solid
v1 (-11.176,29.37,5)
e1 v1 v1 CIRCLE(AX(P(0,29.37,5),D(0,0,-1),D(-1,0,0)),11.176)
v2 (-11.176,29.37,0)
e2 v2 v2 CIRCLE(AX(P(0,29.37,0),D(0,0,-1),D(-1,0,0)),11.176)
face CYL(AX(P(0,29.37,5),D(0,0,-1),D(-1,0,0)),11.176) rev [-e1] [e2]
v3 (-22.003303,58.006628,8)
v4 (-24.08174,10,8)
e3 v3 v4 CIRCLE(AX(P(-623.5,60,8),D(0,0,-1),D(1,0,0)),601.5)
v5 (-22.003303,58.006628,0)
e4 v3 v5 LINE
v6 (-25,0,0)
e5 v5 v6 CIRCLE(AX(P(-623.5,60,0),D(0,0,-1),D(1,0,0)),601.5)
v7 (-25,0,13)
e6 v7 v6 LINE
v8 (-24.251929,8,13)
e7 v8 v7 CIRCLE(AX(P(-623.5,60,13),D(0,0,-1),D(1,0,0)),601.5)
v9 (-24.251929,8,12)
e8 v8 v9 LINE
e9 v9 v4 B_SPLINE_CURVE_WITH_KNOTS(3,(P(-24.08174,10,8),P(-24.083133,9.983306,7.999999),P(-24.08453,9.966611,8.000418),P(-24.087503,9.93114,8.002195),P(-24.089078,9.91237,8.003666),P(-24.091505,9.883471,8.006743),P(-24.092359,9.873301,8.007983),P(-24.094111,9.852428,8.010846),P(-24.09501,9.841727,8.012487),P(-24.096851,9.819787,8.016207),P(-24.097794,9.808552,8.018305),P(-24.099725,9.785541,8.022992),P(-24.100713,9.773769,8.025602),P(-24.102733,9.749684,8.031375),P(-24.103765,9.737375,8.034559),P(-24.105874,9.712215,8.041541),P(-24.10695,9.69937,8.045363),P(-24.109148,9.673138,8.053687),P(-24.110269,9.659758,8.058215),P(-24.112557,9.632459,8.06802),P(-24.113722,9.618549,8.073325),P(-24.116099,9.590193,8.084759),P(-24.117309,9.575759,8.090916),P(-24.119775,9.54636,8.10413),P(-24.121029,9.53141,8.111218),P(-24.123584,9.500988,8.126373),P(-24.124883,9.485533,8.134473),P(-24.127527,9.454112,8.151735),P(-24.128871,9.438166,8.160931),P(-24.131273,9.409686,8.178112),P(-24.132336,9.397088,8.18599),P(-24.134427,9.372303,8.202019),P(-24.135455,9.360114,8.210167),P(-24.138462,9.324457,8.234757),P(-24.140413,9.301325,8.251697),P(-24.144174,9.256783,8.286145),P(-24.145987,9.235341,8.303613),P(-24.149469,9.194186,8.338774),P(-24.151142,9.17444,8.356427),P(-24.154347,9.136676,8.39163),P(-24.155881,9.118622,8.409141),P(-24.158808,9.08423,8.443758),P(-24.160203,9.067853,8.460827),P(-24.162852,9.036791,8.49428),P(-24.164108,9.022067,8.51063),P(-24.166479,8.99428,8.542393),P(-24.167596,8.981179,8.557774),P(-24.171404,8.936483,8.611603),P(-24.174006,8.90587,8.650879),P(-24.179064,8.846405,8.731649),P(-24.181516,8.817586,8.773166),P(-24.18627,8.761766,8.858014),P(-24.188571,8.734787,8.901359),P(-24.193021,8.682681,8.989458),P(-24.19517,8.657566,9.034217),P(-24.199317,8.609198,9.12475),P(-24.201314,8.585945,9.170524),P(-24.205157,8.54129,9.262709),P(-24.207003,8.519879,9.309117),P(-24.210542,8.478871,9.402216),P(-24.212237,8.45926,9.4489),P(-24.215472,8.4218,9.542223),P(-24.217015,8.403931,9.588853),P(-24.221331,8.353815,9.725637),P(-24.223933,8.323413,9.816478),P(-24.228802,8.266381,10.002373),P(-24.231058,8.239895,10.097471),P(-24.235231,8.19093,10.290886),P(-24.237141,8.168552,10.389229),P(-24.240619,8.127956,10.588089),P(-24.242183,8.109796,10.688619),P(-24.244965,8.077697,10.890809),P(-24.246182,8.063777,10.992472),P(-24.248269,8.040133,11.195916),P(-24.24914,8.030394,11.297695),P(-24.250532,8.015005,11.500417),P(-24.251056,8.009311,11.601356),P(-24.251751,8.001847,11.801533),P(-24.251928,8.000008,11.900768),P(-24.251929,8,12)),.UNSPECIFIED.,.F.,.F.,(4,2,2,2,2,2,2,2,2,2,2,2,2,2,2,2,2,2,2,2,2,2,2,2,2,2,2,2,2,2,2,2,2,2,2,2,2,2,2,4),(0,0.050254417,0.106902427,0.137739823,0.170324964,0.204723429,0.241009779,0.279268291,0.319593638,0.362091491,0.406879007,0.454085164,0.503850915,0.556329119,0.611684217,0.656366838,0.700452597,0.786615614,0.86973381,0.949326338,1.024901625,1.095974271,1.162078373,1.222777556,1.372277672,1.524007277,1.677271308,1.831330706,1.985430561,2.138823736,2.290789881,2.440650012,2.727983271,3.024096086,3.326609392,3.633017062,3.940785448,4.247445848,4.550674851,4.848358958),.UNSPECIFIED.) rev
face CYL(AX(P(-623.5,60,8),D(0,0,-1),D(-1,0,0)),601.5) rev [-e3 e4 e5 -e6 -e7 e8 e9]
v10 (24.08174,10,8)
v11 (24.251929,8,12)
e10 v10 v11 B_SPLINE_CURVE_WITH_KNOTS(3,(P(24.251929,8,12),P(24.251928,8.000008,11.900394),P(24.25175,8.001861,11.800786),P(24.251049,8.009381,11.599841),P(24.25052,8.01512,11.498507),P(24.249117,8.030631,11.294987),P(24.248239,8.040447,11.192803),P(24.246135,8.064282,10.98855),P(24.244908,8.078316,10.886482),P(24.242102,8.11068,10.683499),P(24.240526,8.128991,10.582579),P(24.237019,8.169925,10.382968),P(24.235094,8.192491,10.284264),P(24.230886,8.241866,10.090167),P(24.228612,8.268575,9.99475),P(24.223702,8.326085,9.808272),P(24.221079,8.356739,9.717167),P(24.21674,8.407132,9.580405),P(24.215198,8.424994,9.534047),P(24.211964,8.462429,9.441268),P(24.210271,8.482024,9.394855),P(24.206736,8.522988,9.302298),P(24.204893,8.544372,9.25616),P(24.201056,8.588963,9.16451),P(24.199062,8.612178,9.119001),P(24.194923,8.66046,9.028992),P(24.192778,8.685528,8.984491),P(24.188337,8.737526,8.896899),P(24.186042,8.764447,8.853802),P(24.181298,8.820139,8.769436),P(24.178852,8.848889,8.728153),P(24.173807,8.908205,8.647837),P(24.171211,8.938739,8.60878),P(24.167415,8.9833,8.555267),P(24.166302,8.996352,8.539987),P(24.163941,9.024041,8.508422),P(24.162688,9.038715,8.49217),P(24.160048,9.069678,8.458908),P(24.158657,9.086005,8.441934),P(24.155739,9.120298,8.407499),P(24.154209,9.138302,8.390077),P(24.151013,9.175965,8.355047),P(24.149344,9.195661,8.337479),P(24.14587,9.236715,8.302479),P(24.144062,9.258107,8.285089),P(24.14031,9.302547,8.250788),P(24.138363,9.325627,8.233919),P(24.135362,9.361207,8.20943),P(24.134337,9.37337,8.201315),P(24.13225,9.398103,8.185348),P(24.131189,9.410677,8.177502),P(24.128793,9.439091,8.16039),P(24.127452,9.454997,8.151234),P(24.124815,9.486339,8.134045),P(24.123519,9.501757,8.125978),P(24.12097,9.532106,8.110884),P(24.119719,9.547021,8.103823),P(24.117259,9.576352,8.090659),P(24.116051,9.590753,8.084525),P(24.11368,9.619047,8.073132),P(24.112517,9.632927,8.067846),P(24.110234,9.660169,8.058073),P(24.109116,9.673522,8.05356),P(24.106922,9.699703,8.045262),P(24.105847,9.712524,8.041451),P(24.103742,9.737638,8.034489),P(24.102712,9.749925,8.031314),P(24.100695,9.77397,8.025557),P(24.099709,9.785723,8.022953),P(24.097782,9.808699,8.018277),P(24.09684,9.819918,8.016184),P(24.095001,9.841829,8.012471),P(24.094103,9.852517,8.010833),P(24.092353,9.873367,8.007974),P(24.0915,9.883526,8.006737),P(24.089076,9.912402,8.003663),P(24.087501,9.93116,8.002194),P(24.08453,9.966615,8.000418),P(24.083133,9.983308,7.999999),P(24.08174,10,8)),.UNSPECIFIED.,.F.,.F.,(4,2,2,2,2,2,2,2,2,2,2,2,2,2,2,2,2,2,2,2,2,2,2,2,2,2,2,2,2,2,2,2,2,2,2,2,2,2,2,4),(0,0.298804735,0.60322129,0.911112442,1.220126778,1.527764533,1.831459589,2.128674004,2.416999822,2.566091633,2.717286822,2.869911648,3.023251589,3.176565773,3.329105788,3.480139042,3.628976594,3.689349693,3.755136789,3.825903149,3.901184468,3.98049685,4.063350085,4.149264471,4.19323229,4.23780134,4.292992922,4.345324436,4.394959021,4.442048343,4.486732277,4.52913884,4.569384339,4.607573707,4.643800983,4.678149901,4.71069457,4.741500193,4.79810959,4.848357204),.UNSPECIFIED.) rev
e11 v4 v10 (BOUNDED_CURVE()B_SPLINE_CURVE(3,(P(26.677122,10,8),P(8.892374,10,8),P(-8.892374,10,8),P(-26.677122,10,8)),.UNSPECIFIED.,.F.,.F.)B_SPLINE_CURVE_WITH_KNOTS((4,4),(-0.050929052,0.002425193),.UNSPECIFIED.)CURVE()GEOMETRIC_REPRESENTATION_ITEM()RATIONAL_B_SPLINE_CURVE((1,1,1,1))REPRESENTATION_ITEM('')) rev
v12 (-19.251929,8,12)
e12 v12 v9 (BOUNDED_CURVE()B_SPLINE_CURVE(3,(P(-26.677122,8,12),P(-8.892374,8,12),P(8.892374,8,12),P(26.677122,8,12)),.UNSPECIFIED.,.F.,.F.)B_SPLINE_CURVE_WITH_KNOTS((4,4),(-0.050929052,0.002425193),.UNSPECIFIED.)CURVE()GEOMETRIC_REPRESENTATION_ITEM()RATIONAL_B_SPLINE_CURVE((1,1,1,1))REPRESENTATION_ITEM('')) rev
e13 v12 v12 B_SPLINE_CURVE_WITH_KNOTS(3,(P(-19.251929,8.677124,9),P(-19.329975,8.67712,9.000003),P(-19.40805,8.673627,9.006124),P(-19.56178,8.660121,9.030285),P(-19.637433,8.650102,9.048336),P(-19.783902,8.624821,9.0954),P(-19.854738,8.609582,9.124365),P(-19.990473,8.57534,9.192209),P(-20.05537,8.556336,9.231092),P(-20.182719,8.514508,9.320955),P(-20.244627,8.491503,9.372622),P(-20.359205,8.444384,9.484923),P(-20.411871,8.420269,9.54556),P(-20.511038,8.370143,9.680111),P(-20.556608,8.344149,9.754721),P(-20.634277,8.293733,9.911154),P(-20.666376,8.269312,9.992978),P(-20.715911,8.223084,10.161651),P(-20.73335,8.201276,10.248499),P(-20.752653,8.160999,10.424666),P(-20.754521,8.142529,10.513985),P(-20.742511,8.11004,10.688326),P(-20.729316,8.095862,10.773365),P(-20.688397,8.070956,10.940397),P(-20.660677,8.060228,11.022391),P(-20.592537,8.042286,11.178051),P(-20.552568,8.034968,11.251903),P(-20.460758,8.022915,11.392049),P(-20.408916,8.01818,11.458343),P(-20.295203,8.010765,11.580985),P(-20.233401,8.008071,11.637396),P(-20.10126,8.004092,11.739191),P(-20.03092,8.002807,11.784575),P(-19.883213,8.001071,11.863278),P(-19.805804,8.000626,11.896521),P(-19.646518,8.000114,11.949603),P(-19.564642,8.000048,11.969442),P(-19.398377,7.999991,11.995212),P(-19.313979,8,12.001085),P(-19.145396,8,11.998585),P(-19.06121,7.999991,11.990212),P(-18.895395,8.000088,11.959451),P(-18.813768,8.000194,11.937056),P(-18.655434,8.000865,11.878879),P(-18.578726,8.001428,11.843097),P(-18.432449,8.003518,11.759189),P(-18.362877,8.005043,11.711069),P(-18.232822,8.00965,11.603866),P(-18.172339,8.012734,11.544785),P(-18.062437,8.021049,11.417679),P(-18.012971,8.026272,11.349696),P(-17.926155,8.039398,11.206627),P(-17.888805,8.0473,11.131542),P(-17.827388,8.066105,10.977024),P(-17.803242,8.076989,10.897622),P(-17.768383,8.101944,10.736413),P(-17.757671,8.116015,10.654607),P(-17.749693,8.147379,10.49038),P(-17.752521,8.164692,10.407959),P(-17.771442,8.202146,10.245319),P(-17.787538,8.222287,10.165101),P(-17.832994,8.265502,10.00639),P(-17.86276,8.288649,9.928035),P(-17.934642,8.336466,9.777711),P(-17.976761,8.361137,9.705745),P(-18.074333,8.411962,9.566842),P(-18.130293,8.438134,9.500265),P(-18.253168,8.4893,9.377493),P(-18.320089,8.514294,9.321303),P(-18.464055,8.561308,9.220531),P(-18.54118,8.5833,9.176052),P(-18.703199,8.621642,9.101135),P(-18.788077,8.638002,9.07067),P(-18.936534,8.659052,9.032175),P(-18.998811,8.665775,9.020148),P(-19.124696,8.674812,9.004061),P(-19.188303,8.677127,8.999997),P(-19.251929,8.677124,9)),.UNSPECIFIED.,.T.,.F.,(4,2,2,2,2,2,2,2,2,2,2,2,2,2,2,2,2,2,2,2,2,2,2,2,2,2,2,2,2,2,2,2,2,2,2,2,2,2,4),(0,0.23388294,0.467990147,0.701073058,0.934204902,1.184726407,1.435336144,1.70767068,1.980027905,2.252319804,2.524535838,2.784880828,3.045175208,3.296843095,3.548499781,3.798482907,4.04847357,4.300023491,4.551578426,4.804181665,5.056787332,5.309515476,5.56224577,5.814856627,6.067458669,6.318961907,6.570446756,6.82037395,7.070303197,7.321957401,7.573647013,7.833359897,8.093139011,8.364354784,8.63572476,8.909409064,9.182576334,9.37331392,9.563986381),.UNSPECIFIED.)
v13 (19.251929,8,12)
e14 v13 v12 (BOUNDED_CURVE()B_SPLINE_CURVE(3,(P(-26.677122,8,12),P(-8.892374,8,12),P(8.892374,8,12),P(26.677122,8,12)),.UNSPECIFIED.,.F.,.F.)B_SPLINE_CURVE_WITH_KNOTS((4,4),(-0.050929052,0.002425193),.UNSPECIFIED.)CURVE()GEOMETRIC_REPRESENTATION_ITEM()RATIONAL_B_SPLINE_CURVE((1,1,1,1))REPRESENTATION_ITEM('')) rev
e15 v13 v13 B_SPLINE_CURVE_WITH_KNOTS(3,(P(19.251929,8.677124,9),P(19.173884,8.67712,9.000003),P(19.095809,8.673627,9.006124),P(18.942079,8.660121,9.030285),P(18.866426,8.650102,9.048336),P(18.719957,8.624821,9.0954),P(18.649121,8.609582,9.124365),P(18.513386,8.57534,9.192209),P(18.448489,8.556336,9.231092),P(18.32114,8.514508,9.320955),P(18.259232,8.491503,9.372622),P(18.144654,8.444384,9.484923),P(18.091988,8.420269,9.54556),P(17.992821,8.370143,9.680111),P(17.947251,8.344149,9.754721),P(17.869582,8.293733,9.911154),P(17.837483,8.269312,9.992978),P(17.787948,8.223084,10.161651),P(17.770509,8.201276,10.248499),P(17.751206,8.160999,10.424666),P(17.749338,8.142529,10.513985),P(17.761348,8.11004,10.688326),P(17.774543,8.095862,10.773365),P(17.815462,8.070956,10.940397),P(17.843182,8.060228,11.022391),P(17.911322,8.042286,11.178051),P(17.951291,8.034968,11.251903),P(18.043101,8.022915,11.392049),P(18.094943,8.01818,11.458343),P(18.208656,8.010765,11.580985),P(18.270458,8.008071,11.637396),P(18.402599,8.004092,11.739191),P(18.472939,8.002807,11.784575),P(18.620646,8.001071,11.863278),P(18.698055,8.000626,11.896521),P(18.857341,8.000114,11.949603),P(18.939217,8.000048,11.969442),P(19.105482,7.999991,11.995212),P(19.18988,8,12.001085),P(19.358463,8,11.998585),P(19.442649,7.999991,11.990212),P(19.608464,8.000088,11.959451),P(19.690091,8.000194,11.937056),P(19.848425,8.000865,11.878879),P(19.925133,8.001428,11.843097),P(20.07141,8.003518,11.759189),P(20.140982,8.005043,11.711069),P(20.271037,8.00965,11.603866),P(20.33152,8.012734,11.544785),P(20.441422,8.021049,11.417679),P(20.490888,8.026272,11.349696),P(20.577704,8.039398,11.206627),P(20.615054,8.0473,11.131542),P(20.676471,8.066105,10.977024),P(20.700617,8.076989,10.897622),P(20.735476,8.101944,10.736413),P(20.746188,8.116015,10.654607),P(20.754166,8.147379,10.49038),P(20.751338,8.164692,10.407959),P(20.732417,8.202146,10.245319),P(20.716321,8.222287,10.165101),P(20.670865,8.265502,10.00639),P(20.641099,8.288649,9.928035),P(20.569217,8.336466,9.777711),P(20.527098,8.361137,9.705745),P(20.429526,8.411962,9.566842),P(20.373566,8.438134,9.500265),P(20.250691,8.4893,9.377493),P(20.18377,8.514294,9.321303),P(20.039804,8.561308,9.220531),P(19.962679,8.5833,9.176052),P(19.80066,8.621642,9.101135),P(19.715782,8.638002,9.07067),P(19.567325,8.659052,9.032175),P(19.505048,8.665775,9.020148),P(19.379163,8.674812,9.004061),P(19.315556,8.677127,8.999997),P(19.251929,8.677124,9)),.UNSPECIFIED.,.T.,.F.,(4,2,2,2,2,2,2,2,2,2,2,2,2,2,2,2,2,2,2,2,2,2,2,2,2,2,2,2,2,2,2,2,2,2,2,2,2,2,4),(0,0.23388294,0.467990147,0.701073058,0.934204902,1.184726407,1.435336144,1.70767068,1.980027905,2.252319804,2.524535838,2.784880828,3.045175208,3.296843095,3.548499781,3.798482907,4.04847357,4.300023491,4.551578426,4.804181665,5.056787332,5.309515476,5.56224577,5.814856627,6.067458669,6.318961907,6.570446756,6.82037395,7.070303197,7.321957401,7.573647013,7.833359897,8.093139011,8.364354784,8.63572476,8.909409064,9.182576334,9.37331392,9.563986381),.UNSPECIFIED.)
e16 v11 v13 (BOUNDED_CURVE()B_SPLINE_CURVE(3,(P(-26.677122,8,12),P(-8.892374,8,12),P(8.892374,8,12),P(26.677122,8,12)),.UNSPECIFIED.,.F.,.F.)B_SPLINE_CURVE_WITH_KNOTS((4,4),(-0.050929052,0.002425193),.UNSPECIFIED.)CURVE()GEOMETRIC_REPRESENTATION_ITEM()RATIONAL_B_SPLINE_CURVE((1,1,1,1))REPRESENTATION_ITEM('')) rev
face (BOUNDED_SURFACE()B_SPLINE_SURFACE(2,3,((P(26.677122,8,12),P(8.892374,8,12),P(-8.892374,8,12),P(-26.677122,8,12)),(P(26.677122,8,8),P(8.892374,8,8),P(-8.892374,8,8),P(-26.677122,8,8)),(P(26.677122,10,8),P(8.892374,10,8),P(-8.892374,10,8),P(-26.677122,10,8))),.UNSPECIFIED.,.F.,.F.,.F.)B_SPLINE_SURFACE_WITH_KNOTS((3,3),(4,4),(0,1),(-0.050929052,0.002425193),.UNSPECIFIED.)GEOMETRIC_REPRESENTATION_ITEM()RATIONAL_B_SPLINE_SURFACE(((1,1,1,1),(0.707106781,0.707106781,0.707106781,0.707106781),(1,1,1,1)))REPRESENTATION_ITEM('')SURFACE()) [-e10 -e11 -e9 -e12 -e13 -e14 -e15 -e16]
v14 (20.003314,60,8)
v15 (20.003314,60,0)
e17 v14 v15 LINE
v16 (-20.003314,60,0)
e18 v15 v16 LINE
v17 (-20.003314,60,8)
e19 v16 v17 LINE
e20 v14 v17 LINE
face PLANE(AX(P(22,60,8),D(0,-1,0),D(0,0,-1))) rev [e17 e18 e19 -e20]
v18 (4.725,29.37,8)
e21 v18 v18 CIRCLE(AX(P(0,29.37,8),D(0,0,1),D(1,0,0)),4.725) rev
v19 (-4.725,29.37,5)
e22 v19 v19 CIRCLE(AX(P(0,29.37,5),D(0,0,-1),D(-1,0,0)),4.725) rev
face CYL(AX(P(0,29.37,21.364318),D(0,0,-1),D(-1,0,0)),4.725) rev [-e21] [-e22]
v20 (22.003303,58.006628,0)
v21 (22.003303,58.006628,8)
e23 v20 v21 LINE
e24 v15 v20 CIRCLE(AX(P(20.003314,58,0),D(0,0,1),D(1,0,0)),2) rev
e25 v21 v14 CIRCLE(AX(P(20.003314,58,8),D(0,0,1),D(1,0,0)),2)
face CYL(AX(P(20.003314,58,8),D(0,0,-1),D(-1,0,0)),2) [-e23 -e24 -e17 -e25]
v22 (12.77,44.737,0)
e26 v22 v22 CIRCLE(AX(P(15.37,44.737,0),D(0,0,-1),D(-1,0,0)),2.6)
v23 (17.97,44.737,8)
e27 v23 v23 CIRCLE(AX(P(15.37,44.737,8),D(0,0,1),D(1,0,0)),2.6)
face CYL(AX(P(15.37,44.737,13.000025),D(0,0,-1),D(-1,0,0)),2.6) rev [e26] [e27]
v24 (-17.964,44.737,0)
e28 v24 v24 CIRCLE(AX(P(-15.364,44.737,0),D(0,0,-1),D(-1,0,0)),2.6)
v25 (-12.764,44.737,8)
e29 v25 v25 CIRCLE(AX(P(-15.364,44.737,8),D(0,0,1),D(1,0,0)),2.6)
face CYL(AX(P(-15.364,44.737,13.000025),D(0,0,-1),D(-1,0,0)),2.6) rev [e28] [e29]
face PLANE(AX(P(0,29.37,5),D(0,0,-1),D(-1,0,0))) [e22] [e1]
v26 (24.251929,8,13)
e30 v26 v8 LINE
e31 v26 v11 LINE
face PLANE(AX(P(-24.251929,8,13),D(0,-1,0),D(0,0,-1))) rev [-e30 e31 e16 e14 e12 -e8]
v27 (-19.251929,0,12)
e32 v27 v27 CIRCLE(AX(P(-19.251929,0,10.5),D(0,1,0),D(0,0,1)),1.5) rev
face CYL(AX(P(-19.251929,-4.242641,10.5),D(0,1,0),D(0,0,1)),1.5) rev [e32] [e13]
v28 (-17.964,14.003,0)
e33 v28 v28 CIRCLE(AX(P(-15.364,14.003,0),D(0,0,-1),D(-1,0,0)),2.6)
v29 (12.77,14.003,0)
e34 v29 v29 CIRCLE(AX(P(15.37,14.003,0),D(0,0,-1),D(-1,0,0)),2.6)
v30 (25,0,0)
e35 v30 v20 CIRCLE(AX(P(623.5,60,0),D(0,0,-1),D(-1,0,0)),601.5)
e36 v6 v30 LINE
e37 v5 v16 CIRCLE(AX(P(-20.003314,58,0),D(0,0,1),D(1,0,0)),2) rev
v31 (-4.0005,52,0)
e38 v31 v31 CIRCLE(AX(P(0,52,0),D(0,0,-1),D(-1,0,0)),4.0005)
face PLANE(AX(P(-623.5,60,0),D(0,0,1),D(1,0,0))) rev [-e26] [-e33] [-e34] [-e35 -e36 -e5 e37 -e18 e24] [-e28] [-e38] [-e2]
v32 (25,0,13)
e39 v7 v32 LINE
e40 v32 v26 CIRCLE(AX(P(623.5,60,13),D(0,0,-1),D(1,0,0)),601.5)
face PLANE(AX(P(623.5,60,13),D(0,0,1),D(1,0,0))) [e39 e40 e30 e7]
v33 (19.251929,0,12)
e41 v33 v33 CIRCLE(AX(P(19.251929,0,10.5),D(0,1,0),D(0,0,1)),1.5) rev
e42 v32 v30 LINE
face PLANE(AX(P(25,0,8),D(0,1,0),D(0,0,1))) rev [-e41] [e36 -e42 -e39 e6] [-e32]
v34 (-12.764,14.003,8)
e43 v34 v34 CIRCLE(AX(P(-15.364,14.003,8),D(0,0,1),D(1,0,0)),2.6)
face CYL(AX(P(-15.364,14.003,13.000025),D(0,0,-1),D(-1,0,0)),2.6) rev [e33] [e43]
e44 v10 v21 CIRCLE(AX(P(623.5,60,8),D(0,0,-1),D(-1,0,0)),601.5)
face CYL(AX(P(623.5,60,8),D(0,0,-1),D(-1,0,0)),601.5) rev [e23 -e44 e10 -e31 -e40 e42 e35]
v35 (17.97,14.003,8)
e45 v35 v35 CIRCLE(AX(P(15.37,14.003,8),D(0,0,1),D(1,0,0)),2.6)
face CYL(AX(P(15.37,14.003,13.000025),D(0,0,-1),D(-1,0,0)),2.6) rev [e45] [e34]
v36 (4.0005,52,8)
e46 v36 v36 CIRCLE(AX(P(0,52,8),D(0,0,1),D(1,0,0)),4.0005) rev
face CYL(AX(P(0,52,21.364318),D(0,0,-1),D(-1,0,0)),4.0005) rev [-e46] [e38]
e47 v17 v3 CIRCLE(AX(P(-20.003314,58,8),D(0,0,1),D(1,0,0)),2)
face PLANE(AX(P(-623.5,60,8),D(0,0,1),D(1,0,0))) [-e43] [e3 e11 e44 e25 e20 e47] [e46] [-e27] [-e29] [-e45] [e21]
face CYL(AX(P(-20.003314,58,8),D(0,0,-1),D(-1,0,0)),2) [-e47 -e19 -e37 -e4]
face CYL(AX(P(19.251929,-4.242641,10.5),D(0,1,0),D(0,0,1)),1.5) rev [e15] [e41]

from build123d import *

# Parameters (mm, degrees)
BOSS_EXTRUDE1_DEPTH  = 8
BOSS_EXTRUDE2_DEPTH  = 5
SKETCH3_R            = 1.5
CUT_EXTRUDE_DEPTH    = 8
FILLET1_SIZE         = 2
FILLET1_SIZE_2       = 4
FILLET2_R            = 2
SKETCH4_R            = 4.0005
SKETCH4_R_2          = 4.725
M4_H6_T_INSERT_DEPTH = 8
SKETCH13_R           = 11.176
CUT_EXTRUDE2_DEPTH   = 5
SKETCH14_R           = 2.6
CUT_EXTRUDE3_DEPTH   = 67.287253734


with BuildPart() as part:
    # Sketch1 → Boss-Extrude1 (new body)
    with BuildSketch(Plane.XY):
        with BuildLine():
            Line((22, 60), (-22, 60))
            ThreePointArc((-22, 60), (-22.750468165, 29.962523408), (-25, 0))
            Line((-25, 0), (25, 0))
            ThreePointArc((25, 0), (22.750468165, 29.962523408), (22, 60))
        make_face()
    extrude(amount=BOSS_EXTRUDE1_DEPTH)

    # Sketch2 → Boss-Extrude2 (add)
    with BuildSketch(Plane.XY.offset(8)):
        with BuildLine():
            Line((-25, 0), (25, 0))
            ThreePointArc((25, 0), (24.612606496, 3.998750886), (24.251929498, 8))
            Line((24.251929498, 8), (-24.251929498, 8))
            ThreePointArc((-24.251929498, 8), (-24.612606496, 3.998750886), (-25, 0))
        make_face()
    extrude(amount=BOSS_EXTRUDE2_DEPTH)

    # Sketch3 → Cut-Extrude (cut)
    with BuildSketch(Plane(origin=(0, 8, 0), x_dir=(1, 0, 0), z_dir=(0, 1, 0))):
        with Locations(Location((-19.251929498, -10.5, 0), (0, 0, 270))):
            Circle(SKETCH3_R)
        with Locations(Location((19.251929498, -10.5, 0), (0, 0, 270))):
            Circle(SKETCH3_R)
    extrude(amount=-CUT_EXTRUDE_DEPTH, mode=Mode.SUBTRACT)

    # Fillet1
    # an asymmetric fillet: 4, 2 mm, written as the material it adds along each edge
    with BuildSketch(Plane(origin=(34.251929498, 8, 8), x_dir=(0, 1, 0), z_dir=(-1, 0, 0))) as fillet1_piece_1_section:
        with BuildLine():
            Bezier((FILLET1_SIZE, 0), (0, 0), (0, -FILLET1_SIZE_2), weights=[1, 0.707106781, 1])
            Line((0, -FILLET1_SIZE_2), (-0.08, -4))
            Line((-0.08, -4), (-0.08, 0.08))
            Line((-0.08, 0.08), (2, 0.08))
            Line((2, 0.08), (FILLET1_SIZE, 0))
        make_face()
    fillet1_piece_1 = extrude(amount=68.503858997, mode=Mode.PRIVATE)
    fillet1_piece_1 = fillet1_piece_1 - Plane(origin=(-623.5, 60, 8.94437244), x_dir=(1, 0, 0), z_dir=(0, 0, -1)) * Cylinder(601.5, 154, mode=Mode.PRIVATE)
    fillet1_piece_1 = fillet1_piece_1 - Plane(origin=(623.5, 60, 8.94437244), x_dir=(-0.9950124688279272, -0.09975062344142714, 0), z_dir=(0, 0, -1)) * Cylinder(601.5, 154, mode=Mode.PRIVATE)
    fillet1_piece_1 = fillet1_piece_1 - Plane(origin=(-19.251929498, 8.425610742, 10.5), x_dir=(0, 0, 1), z_dir=(0, 1, 0)) * Cylinder(1.5, 154, mode=Mode.PRIVATE)
    fillet1_piece_1 = fillet1_piece_1 - Plane(origin=(19.251929498, 8.425610742, 10.5), x_dir=(0, 0, 1), z_dir=(0, 1, 0)) * Cylinder(1.5, 154, mode=Mode.PRIVATE)
    add(fillet1_piece_1)

    # Fillet2
    fillet2_edges = [part.edges().sort_by_distance(p)[0] for p in [
        (22, 60, 4),
        (-22, 60, 4),
    ]]
    fillet(fillet2_edges, radius=FILLET2_R)

    # Sketch4 → M4*H6 T-Insert (cut)
    with BuildSketch(Plane(origin=(0, 0, 0), x_dir=(-1, 0, 0), z_dir=(0, 0, -1))):
        with Locations((0, 52)):
            Circle(SKETCH4_R)
        with Locations((0, 29.37)):
            Circle(SKETCH4_R_2)
    extrude(amount=-M4_H6_T_INSERT_DEPTH, mode=Mode.SUBTRACT)

    # Sketch13 → Cut-Extrude2 (cut)
    with BuildSketch(Plane(origin=(0, 0, 0), x_dir=(-1, 0, 0), z_dir=(0, 0, -1))):
        with Locations((0, 29.37)):
            Circle(SKETCH13_R)
    extrude(amount=-CUT_EXTRUDE2_DEPTH, mode=Mode.SUBTRACT)

    # Sketch14 → Cut-Extrude3 (cut, through all)
    with BuildSketch(Plane(origin=(0, 0, 0), x_dir=(-1, 0, 0), z_dir=(0, 0, -1))):
        with Locations((15.364, 14.003)):
            Circle(SKETCH14_R)
        with Locations((15.364, 44.737)):
            Circle(SKETCH14_R)
        with Locations((-15.37, 44.737)):
            Circle(SKETCH14_R)
        with Locations((-15.37, 14.003)):
            Circle(SKETCH14_R)
    extrude(amount=-CUT_EXTRUDE3_DEPTH, mode=Mode.SUBTRACT)


solid = part.part
